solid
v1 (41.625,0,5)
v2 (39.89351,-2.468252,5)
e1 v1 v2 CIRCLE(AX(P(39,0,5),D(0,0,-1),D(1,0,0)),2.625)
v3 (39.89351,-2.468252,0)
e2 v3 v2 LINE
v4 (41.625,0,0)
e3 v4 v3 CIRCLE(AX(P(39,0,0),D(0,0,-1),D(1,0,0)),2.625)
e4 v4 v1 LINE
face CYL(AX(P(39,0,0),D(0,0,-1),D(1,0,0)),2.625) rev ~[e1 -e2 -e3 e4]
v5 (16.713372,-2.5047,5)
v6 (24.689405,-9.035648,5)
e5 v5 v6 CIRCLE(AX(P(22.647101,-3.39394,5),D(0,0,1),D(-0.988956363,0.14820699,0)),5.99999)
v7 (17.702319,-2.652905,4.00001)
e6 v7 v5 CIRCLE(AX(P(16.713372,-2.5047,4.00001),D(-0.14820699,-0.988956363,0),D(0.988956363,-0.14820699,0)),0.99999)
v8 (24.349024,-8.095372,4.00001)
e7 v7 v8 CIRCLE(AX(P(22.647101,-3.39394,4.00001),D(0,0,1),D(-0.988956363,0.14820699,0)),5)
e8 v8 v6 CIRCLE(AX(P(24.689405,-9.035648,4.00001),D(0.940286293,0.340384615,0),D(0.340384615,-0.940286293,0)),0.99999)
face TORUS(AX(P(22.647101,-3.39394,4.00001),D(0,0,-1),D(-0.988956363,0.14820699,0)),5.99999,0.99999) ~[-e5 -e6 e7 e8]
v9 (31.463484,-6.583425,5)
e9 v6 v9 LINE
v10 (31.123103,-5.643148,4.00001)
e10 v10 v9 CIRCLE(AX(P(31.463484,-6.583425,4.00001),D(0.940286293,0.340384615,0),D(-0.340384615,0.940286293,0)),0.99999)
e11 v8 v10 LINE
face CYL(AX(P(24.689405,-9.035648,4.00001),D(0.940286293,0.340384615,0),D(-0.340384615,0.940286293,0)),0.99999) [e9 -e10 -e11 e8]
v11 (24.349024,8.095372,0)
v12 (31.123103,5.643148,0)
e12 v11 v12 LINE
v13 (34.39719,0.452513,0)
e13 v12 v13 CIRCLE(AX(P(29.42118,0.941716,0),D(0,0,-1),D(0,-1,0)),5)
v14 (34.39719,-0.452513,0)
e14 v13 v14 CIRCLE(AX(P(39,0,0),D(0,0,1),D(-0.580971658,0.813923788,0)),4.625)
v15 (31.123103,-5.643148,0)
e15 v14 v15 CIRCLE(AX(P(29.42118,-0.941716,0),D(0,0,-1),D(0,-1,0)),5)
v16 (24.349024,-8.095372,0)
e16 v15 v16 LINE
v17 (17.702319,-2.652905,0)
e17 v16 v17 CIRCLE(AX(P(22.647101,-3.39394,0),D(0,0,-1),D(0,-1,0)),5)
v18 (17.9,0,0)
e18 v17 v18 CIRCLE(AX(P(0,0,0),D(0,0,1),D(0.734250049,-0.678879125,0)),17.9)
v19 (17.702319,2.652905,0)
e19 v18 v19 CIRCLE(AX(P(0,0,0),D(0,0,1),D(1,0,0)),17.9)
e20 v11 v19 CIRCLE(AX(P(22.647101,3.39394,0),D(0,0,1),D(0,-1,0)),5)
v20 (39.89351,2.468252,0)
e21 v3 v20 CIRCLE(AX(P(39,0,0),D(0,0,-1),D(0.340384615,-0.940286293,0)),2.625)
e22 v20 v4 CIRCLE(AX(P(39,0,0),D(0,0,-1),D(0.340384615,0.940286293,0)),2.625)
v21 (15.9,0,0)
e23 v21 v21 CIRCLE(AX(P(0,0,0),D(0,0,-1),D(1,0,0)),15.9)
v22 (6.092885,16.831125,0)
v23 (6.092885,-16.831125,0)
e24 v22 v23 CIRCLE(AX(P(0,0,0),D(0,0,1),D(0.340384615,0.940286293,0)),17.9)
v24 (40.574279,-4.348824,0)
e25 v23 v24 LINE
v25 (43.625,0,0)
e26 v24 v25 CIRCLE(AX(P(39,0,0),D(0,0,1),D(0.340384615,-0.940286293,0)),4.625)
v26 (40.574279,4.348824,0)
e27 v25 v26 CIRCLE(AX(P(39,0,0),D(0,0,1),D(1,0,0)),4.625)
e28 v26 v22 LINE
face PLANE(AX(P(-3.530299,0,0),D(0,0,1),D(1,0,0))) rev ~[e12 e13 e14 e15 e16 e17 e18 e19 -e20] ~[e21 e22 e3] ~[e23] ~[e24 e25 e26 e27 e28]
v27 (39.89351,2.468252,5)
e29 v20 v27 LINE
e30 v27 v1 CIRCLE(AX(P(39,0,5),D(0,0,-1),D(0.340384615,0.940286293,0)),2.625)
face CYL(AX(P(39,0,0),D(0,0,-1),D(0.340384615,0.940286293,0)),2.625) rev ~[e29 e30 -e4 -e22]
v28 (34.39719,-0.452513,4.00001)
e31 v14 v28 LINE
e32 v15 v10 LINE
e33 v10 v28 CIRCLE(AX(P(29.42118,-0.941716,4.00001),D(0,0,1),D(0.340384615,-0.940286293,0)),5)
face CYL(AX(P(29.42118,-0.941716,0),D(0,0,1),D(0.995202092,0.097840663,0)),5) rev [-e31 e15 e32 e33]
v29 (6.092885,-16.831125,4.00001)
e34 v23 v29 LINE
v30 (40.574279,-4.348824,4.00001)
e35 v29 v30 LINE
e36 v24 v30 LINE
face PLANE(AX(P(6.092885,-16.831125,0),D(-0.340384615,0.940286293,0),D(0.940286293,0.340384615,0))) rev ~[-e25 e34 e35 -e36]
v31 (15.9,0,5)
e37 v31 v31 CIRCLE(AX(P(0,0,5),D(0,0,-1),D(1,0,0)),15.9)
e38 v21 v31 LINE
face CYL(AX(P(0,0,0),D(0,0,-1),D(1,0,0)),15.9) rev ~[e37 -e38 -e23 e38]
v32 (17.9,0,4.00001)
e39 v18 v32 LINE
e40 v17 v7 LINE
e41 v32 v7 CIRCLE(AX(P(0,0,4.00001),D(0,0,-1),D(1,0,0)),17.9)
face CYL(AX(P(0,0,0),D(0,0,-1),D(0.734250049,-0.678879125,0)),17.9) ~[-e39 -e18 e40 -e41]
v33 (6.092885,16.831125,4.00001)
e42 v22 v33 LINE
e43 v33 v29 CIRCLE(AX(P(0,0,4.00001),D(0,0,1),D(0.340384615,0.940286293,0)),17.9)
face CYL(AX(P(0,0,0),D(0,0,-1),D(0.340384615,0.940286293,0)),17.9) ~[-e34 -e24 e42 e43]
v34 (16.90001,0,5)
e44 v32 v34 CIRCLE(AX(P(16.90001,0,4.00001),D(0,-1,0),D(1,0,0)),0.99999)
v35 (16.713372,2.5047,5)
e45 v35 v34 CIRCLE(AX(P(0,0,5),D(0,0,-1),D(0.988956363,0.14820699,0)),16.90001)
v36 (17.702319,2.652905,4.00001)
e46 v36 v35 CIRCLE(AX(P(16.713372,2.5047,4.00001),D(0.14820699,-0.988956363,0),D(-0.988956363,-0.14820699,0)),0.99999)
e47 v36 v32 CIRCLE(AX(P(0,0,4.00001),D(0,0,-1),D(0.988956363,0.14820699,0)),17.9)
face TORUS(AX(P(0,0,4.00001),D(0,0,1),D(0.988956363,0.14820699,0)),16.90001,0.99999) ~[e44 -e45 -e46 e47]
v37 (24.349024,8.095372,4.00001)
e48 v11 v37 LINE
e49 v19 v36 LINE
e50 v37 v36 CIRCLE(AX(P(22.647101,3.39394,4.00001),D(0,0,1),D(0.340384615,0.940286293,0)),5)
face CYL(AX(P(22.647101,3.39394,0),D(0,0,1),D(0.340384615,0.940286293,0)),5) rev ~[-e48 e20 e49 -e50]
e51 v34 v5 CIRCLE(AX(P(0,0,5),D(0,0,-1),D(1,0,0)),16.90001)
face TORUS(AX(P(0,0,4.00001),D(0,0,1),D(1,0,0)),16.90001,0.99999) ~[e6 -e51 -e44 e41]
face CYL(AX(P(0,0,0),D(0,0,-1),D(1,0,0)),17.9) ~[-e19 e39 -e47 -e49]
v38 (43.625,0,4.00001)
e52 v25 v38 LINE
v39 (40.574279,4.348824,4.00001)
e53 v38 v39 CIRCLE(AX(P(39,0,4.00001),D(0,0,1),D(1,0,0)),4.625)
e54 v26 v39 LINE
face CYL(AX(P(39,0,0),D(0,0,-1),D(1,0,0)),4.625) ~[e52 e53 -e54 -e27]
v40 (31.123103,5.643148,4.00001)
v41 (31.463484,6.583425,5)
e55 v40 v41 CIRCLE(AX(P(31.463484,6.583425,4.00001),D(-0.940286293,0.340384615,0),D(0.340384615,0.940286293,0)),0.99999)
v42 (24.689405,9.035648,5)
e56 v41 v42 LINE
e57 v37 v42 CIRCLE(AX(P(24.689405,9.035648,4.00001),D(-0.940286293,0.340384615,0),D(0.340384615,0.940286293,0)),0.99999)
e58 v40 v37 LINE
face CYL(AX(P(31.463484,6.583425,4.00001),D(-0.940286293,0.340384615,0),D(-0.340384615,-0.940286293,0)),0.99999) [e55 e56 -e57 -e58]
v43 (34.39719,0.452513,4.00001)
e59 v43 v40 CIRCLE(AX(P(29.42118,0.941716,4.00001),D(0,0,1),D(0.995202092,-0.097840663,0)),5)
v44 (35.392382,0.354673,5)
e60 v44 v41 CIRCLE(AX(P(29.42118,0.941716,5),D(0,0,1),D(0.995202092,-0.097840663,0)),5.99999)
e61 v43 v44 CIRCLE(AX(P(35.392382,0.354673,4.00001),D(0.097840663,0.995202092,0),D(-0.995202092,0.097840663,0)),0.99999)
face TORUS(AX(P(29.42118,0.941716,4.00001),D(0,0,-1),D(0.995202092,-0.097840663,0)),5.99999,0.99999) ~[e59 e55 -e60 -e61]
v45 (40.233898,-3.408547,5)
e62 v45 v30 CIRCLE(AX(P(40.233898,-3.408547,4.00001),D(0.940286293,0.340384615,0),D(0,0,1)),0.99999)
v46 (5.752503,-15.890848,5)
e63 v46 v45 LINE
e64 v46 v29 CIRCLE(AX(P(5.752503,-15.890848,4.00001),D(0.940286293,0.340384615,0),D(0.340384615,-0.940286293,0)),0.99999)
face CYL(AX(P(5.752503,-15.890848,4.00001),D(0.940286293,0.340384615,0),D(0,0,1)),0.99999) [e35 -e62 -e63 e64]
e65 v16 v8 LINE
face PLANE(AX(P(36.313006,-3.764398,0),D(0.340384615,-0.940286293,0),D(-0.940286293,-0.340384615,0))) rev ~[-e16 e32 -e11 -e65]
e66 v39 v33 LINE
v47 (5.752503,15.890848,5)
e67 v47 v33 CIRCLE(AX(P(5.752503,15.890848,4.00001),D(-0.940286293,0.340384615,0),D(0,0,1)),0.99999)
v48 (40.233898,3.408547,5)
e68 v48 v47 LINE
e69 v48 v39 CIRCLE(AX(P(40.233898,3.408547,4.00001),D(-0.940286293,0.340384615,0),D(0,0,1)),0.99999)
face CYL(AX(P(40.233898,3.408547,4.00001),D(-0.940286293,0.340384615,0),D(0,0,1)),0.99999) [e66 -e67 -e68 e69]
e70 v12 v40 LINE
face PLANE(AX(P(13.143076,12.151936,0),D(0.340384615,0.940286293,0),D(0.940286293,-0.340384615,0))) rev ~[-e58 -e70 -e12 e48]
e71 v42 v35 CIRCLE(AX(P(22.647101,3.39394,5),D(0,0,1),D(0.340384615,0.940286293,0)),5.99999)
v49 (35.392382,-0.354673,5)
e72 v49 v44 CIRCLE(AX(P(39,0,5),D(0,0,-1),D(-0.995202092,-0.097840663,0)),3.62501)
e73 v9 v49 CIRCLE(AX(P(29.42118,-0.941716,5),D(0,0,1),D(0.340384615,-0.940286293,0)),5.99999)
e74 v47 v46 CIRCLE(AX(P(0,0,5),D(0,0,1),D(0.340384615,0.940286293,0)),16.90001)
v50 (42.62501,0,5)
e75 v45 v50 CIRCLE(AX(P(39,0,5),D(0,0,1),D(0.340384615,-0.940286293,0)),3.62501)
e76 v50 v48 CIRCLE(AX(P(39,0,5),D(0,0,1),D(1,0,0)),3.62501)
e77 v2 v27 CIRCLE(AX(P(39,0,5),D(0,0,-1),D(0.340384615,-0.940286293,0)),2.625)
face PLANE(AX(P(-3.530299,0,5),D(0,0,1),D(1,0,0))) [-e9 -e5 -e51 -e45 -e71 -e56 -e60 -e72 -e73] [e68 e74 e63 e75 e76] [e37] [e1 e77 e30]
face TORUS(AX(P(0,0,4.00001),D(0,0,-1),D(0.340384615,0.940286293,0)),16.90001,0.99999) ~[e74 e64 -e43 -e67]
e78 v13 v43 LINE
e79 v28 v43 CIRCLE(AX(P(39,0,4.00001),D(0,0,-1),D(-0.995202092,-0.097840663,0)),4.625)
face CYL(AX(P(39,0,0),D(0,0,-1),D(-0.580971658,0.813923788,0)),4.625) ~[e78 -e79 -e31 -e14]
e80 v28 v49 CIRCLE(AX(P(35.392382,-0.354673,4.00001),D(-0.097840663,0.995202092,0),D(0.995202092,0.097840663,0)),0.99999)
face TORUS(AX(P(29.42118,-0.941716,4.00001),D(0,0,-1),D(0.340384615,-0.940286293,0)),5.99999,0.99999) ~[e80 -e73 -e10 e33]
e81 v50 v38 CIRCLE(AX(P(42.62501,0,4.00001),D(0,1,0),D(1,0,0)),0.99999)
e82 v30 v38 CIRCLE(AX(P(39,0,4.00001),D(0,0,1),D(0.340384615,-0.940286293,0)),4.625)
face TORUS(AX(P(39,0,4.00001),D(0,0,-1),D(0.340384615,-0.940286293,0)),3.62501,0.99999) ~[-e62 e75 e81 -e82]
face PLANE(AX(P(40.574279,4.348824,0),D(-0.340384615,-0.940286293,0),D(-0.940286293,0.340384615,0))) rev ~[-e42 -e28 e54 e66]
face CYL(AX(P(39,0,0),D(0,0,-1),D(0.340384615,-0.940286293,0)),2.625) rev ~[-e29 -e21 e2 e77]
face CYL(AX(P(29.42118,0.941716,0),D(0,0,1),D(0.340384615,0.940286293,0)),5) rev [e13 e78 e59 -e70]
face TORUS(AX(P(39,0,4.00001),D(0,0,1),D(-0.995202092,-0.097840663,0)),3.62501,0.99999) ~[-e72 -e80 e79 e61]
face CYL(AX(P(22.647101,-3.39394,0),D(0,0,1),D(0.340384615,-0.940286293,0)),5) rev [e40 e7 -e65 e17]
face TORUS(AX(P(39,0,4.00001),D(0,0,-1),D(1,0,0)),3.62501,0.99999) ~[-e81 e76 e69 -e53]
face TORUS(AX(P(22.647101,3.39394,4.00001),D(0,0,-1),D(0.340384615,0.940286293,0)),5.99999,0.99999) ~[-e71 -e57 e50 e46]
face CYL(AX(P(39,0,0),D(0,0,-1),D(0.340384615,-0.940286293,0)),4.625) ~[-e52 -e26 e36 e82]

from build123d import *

# Parameters (mm, degrees)
F1_DEPTH = 5
F2_R     = 5
F3_R     = 0.99999


# Not quite as in the source:
# - a fillet or chamfer is up to 0.001 mm smaller than in the source, because OpenCascade refuses the exact size


with BuildPart() as f1:
    # F0 (on Top) → F1 (new body)
    with BuildSketch(Plane.XY):
        with BuildLine():
            ThreePointArc((5.4121153846, -14.9505520655), (-15.9, 0), (5.4121153846, 14.9505520655))
            Line((5.4121153846, 14.9505520655), (13.1430758683, 12.1519363363))
            ThreePointArc((13.1430758683, 12.1519363363), (9.898446583, 14.91411262), (6.0928846154, 16.8311246524))
            ThreePointArc((6.0928846154, 16.8311246524), (-17.9, 0), (6.0928846154, -16.8311246524))
            ThreePointArc((6.0928846154, -16.8311246524), (9.898446583, -14.91411262), (13.1430758683, -12.1519363363))
            Line((13.1430758683, -12.1519363363), (5.4121153846, -14.9505520655))
        make_face()
        with BuildLine():
            ThreePointArc((6.0928846154, 16.8311246524), (9.898446583, 14.91411262), (13.1430758683, 12.1519363363))
            Line((13.1430758683, 12.1519363363), (36.3130060827, 3.76439752))
            ThreePointArc((36.3130060827, 3.76439752), (38.3715715504, 4.5821067953), (40.5742788462, 4.3488241071))
            Line((40.5742788462, 4.3488241071), (6.0928846154, 16.8311246524))
        make_face()
        with BuildLine():
            Line((36.3130060827, -3.76439752), (13.1430758683, -12.1519363363))
            ThreePointArc((13.1430758683, -12.1519363363), (9.898446583, -14.91411262), (6.0928846154, -16.8311246524))
            Line((6.0928846154, -16.8311246524), (40.5742788462, -4.3488241071))
            ThreePointArc((40.5742788462, -4.3488241071), (38.3715715504, -4.5821067953), (36.3130060827, -3.76439752))
        make_face()
        with BuildLine():
            ThreePointArc((40.5742788462, 4.3488241071), (38.3715715504, 4.5821067953), (36.3130060827, 3.76439752))
            Line((36.3130060827, 3.76439752), (39.8935096154, 2.4682515202))
            ThreePointArc((39.8935096154, 2.4682515202), (41.1489634409, 1.507508252), (41.625, 0))
            ThreePointArc((41.625, 0), (41.1489634409, -1.507508252), (39.8935096154, -2.4682515202))
            Line((39.8935096154, -2.4682515202), (36.3130060827, -3.76439752))
            ThreePointArc((36.3130060827, -3.76439752), (38.3715715504, -4.5821067953), (40.5742788462, -4.3488241071))
            ThreePointArc((40.5742788462, -4.3488241071), (42.7862689196, -2.6560859678), (43.625, 0))
            ThreePointArc((43.625, 0), (42.7862689196, 2.6560859678), (40.5742788462, 4.3488241071))
        make_face()
        with BuildLine():
            Line((39.8935096154, 2.4682515202), (36.3130060827, 3.76439752))
            ThreePointArc((36.3130060827, 3.76439752), (34.375, 0), (36.3130060827, -3.76439752))
            Line((36.3130060827, -3.76439752), (39.8935096154, -2.4682515202))
            ThreePointArc((39.8935096154, -2.4682515202), (36.375, 0), (39.8935096154, 2.4682515202))
        make_face()
        with BuildLine():
            ThreePointArc((5.4121153846, 14.9505520655), (13.0165785561, 9.1311928406), (15.9, 0))
            ThreePointArc((15.9, 0), (13.0165785561, -9.1311928406), (5.4121153846, -14.9505520655))
            Line((5.4121153846, -14.9505520655), (13.1430758683, -12.1519363363))
            ThreePointArc((13.1430758683, -12.1519363363), (16.6683991139, -6.5249115687), (17.9, 0))
            ThreePointArc((17.9, 0), (16.6683991139, 6.5249115687), (13.1430758683, 12.1519363363))
            Line((13.1430758683, 12.1519363363), (5.4121153846, 14.9505520655))
        make_face()
    extrude(amount=F1_DEPTH)

    # F2
    f2_edges = [f1.edges().sort_by_distance(p)[0] for p in [
        (36.313006, 3.764398, 2.5),
        (36.313006, -3.764398, 2.5),
        (13.143076, 12.151936, 2.5),
        (13.143076, -12.151936, 2.5),
    ]]
    fillet(f2_edges, radius=F2_R)

    # F3 (radius 1 in the source; OpenCascade refuses exactly that, so slightly less here)
    f3_edges = [f1.edges().sort_by_distance(p)[0] for p in [
        (23.333582, 10.589974, 5),
        (19.479429, 7.262513, 5),
    ]]
    fillet(f3_edges, radius=F3_R)


solid = f1.part
